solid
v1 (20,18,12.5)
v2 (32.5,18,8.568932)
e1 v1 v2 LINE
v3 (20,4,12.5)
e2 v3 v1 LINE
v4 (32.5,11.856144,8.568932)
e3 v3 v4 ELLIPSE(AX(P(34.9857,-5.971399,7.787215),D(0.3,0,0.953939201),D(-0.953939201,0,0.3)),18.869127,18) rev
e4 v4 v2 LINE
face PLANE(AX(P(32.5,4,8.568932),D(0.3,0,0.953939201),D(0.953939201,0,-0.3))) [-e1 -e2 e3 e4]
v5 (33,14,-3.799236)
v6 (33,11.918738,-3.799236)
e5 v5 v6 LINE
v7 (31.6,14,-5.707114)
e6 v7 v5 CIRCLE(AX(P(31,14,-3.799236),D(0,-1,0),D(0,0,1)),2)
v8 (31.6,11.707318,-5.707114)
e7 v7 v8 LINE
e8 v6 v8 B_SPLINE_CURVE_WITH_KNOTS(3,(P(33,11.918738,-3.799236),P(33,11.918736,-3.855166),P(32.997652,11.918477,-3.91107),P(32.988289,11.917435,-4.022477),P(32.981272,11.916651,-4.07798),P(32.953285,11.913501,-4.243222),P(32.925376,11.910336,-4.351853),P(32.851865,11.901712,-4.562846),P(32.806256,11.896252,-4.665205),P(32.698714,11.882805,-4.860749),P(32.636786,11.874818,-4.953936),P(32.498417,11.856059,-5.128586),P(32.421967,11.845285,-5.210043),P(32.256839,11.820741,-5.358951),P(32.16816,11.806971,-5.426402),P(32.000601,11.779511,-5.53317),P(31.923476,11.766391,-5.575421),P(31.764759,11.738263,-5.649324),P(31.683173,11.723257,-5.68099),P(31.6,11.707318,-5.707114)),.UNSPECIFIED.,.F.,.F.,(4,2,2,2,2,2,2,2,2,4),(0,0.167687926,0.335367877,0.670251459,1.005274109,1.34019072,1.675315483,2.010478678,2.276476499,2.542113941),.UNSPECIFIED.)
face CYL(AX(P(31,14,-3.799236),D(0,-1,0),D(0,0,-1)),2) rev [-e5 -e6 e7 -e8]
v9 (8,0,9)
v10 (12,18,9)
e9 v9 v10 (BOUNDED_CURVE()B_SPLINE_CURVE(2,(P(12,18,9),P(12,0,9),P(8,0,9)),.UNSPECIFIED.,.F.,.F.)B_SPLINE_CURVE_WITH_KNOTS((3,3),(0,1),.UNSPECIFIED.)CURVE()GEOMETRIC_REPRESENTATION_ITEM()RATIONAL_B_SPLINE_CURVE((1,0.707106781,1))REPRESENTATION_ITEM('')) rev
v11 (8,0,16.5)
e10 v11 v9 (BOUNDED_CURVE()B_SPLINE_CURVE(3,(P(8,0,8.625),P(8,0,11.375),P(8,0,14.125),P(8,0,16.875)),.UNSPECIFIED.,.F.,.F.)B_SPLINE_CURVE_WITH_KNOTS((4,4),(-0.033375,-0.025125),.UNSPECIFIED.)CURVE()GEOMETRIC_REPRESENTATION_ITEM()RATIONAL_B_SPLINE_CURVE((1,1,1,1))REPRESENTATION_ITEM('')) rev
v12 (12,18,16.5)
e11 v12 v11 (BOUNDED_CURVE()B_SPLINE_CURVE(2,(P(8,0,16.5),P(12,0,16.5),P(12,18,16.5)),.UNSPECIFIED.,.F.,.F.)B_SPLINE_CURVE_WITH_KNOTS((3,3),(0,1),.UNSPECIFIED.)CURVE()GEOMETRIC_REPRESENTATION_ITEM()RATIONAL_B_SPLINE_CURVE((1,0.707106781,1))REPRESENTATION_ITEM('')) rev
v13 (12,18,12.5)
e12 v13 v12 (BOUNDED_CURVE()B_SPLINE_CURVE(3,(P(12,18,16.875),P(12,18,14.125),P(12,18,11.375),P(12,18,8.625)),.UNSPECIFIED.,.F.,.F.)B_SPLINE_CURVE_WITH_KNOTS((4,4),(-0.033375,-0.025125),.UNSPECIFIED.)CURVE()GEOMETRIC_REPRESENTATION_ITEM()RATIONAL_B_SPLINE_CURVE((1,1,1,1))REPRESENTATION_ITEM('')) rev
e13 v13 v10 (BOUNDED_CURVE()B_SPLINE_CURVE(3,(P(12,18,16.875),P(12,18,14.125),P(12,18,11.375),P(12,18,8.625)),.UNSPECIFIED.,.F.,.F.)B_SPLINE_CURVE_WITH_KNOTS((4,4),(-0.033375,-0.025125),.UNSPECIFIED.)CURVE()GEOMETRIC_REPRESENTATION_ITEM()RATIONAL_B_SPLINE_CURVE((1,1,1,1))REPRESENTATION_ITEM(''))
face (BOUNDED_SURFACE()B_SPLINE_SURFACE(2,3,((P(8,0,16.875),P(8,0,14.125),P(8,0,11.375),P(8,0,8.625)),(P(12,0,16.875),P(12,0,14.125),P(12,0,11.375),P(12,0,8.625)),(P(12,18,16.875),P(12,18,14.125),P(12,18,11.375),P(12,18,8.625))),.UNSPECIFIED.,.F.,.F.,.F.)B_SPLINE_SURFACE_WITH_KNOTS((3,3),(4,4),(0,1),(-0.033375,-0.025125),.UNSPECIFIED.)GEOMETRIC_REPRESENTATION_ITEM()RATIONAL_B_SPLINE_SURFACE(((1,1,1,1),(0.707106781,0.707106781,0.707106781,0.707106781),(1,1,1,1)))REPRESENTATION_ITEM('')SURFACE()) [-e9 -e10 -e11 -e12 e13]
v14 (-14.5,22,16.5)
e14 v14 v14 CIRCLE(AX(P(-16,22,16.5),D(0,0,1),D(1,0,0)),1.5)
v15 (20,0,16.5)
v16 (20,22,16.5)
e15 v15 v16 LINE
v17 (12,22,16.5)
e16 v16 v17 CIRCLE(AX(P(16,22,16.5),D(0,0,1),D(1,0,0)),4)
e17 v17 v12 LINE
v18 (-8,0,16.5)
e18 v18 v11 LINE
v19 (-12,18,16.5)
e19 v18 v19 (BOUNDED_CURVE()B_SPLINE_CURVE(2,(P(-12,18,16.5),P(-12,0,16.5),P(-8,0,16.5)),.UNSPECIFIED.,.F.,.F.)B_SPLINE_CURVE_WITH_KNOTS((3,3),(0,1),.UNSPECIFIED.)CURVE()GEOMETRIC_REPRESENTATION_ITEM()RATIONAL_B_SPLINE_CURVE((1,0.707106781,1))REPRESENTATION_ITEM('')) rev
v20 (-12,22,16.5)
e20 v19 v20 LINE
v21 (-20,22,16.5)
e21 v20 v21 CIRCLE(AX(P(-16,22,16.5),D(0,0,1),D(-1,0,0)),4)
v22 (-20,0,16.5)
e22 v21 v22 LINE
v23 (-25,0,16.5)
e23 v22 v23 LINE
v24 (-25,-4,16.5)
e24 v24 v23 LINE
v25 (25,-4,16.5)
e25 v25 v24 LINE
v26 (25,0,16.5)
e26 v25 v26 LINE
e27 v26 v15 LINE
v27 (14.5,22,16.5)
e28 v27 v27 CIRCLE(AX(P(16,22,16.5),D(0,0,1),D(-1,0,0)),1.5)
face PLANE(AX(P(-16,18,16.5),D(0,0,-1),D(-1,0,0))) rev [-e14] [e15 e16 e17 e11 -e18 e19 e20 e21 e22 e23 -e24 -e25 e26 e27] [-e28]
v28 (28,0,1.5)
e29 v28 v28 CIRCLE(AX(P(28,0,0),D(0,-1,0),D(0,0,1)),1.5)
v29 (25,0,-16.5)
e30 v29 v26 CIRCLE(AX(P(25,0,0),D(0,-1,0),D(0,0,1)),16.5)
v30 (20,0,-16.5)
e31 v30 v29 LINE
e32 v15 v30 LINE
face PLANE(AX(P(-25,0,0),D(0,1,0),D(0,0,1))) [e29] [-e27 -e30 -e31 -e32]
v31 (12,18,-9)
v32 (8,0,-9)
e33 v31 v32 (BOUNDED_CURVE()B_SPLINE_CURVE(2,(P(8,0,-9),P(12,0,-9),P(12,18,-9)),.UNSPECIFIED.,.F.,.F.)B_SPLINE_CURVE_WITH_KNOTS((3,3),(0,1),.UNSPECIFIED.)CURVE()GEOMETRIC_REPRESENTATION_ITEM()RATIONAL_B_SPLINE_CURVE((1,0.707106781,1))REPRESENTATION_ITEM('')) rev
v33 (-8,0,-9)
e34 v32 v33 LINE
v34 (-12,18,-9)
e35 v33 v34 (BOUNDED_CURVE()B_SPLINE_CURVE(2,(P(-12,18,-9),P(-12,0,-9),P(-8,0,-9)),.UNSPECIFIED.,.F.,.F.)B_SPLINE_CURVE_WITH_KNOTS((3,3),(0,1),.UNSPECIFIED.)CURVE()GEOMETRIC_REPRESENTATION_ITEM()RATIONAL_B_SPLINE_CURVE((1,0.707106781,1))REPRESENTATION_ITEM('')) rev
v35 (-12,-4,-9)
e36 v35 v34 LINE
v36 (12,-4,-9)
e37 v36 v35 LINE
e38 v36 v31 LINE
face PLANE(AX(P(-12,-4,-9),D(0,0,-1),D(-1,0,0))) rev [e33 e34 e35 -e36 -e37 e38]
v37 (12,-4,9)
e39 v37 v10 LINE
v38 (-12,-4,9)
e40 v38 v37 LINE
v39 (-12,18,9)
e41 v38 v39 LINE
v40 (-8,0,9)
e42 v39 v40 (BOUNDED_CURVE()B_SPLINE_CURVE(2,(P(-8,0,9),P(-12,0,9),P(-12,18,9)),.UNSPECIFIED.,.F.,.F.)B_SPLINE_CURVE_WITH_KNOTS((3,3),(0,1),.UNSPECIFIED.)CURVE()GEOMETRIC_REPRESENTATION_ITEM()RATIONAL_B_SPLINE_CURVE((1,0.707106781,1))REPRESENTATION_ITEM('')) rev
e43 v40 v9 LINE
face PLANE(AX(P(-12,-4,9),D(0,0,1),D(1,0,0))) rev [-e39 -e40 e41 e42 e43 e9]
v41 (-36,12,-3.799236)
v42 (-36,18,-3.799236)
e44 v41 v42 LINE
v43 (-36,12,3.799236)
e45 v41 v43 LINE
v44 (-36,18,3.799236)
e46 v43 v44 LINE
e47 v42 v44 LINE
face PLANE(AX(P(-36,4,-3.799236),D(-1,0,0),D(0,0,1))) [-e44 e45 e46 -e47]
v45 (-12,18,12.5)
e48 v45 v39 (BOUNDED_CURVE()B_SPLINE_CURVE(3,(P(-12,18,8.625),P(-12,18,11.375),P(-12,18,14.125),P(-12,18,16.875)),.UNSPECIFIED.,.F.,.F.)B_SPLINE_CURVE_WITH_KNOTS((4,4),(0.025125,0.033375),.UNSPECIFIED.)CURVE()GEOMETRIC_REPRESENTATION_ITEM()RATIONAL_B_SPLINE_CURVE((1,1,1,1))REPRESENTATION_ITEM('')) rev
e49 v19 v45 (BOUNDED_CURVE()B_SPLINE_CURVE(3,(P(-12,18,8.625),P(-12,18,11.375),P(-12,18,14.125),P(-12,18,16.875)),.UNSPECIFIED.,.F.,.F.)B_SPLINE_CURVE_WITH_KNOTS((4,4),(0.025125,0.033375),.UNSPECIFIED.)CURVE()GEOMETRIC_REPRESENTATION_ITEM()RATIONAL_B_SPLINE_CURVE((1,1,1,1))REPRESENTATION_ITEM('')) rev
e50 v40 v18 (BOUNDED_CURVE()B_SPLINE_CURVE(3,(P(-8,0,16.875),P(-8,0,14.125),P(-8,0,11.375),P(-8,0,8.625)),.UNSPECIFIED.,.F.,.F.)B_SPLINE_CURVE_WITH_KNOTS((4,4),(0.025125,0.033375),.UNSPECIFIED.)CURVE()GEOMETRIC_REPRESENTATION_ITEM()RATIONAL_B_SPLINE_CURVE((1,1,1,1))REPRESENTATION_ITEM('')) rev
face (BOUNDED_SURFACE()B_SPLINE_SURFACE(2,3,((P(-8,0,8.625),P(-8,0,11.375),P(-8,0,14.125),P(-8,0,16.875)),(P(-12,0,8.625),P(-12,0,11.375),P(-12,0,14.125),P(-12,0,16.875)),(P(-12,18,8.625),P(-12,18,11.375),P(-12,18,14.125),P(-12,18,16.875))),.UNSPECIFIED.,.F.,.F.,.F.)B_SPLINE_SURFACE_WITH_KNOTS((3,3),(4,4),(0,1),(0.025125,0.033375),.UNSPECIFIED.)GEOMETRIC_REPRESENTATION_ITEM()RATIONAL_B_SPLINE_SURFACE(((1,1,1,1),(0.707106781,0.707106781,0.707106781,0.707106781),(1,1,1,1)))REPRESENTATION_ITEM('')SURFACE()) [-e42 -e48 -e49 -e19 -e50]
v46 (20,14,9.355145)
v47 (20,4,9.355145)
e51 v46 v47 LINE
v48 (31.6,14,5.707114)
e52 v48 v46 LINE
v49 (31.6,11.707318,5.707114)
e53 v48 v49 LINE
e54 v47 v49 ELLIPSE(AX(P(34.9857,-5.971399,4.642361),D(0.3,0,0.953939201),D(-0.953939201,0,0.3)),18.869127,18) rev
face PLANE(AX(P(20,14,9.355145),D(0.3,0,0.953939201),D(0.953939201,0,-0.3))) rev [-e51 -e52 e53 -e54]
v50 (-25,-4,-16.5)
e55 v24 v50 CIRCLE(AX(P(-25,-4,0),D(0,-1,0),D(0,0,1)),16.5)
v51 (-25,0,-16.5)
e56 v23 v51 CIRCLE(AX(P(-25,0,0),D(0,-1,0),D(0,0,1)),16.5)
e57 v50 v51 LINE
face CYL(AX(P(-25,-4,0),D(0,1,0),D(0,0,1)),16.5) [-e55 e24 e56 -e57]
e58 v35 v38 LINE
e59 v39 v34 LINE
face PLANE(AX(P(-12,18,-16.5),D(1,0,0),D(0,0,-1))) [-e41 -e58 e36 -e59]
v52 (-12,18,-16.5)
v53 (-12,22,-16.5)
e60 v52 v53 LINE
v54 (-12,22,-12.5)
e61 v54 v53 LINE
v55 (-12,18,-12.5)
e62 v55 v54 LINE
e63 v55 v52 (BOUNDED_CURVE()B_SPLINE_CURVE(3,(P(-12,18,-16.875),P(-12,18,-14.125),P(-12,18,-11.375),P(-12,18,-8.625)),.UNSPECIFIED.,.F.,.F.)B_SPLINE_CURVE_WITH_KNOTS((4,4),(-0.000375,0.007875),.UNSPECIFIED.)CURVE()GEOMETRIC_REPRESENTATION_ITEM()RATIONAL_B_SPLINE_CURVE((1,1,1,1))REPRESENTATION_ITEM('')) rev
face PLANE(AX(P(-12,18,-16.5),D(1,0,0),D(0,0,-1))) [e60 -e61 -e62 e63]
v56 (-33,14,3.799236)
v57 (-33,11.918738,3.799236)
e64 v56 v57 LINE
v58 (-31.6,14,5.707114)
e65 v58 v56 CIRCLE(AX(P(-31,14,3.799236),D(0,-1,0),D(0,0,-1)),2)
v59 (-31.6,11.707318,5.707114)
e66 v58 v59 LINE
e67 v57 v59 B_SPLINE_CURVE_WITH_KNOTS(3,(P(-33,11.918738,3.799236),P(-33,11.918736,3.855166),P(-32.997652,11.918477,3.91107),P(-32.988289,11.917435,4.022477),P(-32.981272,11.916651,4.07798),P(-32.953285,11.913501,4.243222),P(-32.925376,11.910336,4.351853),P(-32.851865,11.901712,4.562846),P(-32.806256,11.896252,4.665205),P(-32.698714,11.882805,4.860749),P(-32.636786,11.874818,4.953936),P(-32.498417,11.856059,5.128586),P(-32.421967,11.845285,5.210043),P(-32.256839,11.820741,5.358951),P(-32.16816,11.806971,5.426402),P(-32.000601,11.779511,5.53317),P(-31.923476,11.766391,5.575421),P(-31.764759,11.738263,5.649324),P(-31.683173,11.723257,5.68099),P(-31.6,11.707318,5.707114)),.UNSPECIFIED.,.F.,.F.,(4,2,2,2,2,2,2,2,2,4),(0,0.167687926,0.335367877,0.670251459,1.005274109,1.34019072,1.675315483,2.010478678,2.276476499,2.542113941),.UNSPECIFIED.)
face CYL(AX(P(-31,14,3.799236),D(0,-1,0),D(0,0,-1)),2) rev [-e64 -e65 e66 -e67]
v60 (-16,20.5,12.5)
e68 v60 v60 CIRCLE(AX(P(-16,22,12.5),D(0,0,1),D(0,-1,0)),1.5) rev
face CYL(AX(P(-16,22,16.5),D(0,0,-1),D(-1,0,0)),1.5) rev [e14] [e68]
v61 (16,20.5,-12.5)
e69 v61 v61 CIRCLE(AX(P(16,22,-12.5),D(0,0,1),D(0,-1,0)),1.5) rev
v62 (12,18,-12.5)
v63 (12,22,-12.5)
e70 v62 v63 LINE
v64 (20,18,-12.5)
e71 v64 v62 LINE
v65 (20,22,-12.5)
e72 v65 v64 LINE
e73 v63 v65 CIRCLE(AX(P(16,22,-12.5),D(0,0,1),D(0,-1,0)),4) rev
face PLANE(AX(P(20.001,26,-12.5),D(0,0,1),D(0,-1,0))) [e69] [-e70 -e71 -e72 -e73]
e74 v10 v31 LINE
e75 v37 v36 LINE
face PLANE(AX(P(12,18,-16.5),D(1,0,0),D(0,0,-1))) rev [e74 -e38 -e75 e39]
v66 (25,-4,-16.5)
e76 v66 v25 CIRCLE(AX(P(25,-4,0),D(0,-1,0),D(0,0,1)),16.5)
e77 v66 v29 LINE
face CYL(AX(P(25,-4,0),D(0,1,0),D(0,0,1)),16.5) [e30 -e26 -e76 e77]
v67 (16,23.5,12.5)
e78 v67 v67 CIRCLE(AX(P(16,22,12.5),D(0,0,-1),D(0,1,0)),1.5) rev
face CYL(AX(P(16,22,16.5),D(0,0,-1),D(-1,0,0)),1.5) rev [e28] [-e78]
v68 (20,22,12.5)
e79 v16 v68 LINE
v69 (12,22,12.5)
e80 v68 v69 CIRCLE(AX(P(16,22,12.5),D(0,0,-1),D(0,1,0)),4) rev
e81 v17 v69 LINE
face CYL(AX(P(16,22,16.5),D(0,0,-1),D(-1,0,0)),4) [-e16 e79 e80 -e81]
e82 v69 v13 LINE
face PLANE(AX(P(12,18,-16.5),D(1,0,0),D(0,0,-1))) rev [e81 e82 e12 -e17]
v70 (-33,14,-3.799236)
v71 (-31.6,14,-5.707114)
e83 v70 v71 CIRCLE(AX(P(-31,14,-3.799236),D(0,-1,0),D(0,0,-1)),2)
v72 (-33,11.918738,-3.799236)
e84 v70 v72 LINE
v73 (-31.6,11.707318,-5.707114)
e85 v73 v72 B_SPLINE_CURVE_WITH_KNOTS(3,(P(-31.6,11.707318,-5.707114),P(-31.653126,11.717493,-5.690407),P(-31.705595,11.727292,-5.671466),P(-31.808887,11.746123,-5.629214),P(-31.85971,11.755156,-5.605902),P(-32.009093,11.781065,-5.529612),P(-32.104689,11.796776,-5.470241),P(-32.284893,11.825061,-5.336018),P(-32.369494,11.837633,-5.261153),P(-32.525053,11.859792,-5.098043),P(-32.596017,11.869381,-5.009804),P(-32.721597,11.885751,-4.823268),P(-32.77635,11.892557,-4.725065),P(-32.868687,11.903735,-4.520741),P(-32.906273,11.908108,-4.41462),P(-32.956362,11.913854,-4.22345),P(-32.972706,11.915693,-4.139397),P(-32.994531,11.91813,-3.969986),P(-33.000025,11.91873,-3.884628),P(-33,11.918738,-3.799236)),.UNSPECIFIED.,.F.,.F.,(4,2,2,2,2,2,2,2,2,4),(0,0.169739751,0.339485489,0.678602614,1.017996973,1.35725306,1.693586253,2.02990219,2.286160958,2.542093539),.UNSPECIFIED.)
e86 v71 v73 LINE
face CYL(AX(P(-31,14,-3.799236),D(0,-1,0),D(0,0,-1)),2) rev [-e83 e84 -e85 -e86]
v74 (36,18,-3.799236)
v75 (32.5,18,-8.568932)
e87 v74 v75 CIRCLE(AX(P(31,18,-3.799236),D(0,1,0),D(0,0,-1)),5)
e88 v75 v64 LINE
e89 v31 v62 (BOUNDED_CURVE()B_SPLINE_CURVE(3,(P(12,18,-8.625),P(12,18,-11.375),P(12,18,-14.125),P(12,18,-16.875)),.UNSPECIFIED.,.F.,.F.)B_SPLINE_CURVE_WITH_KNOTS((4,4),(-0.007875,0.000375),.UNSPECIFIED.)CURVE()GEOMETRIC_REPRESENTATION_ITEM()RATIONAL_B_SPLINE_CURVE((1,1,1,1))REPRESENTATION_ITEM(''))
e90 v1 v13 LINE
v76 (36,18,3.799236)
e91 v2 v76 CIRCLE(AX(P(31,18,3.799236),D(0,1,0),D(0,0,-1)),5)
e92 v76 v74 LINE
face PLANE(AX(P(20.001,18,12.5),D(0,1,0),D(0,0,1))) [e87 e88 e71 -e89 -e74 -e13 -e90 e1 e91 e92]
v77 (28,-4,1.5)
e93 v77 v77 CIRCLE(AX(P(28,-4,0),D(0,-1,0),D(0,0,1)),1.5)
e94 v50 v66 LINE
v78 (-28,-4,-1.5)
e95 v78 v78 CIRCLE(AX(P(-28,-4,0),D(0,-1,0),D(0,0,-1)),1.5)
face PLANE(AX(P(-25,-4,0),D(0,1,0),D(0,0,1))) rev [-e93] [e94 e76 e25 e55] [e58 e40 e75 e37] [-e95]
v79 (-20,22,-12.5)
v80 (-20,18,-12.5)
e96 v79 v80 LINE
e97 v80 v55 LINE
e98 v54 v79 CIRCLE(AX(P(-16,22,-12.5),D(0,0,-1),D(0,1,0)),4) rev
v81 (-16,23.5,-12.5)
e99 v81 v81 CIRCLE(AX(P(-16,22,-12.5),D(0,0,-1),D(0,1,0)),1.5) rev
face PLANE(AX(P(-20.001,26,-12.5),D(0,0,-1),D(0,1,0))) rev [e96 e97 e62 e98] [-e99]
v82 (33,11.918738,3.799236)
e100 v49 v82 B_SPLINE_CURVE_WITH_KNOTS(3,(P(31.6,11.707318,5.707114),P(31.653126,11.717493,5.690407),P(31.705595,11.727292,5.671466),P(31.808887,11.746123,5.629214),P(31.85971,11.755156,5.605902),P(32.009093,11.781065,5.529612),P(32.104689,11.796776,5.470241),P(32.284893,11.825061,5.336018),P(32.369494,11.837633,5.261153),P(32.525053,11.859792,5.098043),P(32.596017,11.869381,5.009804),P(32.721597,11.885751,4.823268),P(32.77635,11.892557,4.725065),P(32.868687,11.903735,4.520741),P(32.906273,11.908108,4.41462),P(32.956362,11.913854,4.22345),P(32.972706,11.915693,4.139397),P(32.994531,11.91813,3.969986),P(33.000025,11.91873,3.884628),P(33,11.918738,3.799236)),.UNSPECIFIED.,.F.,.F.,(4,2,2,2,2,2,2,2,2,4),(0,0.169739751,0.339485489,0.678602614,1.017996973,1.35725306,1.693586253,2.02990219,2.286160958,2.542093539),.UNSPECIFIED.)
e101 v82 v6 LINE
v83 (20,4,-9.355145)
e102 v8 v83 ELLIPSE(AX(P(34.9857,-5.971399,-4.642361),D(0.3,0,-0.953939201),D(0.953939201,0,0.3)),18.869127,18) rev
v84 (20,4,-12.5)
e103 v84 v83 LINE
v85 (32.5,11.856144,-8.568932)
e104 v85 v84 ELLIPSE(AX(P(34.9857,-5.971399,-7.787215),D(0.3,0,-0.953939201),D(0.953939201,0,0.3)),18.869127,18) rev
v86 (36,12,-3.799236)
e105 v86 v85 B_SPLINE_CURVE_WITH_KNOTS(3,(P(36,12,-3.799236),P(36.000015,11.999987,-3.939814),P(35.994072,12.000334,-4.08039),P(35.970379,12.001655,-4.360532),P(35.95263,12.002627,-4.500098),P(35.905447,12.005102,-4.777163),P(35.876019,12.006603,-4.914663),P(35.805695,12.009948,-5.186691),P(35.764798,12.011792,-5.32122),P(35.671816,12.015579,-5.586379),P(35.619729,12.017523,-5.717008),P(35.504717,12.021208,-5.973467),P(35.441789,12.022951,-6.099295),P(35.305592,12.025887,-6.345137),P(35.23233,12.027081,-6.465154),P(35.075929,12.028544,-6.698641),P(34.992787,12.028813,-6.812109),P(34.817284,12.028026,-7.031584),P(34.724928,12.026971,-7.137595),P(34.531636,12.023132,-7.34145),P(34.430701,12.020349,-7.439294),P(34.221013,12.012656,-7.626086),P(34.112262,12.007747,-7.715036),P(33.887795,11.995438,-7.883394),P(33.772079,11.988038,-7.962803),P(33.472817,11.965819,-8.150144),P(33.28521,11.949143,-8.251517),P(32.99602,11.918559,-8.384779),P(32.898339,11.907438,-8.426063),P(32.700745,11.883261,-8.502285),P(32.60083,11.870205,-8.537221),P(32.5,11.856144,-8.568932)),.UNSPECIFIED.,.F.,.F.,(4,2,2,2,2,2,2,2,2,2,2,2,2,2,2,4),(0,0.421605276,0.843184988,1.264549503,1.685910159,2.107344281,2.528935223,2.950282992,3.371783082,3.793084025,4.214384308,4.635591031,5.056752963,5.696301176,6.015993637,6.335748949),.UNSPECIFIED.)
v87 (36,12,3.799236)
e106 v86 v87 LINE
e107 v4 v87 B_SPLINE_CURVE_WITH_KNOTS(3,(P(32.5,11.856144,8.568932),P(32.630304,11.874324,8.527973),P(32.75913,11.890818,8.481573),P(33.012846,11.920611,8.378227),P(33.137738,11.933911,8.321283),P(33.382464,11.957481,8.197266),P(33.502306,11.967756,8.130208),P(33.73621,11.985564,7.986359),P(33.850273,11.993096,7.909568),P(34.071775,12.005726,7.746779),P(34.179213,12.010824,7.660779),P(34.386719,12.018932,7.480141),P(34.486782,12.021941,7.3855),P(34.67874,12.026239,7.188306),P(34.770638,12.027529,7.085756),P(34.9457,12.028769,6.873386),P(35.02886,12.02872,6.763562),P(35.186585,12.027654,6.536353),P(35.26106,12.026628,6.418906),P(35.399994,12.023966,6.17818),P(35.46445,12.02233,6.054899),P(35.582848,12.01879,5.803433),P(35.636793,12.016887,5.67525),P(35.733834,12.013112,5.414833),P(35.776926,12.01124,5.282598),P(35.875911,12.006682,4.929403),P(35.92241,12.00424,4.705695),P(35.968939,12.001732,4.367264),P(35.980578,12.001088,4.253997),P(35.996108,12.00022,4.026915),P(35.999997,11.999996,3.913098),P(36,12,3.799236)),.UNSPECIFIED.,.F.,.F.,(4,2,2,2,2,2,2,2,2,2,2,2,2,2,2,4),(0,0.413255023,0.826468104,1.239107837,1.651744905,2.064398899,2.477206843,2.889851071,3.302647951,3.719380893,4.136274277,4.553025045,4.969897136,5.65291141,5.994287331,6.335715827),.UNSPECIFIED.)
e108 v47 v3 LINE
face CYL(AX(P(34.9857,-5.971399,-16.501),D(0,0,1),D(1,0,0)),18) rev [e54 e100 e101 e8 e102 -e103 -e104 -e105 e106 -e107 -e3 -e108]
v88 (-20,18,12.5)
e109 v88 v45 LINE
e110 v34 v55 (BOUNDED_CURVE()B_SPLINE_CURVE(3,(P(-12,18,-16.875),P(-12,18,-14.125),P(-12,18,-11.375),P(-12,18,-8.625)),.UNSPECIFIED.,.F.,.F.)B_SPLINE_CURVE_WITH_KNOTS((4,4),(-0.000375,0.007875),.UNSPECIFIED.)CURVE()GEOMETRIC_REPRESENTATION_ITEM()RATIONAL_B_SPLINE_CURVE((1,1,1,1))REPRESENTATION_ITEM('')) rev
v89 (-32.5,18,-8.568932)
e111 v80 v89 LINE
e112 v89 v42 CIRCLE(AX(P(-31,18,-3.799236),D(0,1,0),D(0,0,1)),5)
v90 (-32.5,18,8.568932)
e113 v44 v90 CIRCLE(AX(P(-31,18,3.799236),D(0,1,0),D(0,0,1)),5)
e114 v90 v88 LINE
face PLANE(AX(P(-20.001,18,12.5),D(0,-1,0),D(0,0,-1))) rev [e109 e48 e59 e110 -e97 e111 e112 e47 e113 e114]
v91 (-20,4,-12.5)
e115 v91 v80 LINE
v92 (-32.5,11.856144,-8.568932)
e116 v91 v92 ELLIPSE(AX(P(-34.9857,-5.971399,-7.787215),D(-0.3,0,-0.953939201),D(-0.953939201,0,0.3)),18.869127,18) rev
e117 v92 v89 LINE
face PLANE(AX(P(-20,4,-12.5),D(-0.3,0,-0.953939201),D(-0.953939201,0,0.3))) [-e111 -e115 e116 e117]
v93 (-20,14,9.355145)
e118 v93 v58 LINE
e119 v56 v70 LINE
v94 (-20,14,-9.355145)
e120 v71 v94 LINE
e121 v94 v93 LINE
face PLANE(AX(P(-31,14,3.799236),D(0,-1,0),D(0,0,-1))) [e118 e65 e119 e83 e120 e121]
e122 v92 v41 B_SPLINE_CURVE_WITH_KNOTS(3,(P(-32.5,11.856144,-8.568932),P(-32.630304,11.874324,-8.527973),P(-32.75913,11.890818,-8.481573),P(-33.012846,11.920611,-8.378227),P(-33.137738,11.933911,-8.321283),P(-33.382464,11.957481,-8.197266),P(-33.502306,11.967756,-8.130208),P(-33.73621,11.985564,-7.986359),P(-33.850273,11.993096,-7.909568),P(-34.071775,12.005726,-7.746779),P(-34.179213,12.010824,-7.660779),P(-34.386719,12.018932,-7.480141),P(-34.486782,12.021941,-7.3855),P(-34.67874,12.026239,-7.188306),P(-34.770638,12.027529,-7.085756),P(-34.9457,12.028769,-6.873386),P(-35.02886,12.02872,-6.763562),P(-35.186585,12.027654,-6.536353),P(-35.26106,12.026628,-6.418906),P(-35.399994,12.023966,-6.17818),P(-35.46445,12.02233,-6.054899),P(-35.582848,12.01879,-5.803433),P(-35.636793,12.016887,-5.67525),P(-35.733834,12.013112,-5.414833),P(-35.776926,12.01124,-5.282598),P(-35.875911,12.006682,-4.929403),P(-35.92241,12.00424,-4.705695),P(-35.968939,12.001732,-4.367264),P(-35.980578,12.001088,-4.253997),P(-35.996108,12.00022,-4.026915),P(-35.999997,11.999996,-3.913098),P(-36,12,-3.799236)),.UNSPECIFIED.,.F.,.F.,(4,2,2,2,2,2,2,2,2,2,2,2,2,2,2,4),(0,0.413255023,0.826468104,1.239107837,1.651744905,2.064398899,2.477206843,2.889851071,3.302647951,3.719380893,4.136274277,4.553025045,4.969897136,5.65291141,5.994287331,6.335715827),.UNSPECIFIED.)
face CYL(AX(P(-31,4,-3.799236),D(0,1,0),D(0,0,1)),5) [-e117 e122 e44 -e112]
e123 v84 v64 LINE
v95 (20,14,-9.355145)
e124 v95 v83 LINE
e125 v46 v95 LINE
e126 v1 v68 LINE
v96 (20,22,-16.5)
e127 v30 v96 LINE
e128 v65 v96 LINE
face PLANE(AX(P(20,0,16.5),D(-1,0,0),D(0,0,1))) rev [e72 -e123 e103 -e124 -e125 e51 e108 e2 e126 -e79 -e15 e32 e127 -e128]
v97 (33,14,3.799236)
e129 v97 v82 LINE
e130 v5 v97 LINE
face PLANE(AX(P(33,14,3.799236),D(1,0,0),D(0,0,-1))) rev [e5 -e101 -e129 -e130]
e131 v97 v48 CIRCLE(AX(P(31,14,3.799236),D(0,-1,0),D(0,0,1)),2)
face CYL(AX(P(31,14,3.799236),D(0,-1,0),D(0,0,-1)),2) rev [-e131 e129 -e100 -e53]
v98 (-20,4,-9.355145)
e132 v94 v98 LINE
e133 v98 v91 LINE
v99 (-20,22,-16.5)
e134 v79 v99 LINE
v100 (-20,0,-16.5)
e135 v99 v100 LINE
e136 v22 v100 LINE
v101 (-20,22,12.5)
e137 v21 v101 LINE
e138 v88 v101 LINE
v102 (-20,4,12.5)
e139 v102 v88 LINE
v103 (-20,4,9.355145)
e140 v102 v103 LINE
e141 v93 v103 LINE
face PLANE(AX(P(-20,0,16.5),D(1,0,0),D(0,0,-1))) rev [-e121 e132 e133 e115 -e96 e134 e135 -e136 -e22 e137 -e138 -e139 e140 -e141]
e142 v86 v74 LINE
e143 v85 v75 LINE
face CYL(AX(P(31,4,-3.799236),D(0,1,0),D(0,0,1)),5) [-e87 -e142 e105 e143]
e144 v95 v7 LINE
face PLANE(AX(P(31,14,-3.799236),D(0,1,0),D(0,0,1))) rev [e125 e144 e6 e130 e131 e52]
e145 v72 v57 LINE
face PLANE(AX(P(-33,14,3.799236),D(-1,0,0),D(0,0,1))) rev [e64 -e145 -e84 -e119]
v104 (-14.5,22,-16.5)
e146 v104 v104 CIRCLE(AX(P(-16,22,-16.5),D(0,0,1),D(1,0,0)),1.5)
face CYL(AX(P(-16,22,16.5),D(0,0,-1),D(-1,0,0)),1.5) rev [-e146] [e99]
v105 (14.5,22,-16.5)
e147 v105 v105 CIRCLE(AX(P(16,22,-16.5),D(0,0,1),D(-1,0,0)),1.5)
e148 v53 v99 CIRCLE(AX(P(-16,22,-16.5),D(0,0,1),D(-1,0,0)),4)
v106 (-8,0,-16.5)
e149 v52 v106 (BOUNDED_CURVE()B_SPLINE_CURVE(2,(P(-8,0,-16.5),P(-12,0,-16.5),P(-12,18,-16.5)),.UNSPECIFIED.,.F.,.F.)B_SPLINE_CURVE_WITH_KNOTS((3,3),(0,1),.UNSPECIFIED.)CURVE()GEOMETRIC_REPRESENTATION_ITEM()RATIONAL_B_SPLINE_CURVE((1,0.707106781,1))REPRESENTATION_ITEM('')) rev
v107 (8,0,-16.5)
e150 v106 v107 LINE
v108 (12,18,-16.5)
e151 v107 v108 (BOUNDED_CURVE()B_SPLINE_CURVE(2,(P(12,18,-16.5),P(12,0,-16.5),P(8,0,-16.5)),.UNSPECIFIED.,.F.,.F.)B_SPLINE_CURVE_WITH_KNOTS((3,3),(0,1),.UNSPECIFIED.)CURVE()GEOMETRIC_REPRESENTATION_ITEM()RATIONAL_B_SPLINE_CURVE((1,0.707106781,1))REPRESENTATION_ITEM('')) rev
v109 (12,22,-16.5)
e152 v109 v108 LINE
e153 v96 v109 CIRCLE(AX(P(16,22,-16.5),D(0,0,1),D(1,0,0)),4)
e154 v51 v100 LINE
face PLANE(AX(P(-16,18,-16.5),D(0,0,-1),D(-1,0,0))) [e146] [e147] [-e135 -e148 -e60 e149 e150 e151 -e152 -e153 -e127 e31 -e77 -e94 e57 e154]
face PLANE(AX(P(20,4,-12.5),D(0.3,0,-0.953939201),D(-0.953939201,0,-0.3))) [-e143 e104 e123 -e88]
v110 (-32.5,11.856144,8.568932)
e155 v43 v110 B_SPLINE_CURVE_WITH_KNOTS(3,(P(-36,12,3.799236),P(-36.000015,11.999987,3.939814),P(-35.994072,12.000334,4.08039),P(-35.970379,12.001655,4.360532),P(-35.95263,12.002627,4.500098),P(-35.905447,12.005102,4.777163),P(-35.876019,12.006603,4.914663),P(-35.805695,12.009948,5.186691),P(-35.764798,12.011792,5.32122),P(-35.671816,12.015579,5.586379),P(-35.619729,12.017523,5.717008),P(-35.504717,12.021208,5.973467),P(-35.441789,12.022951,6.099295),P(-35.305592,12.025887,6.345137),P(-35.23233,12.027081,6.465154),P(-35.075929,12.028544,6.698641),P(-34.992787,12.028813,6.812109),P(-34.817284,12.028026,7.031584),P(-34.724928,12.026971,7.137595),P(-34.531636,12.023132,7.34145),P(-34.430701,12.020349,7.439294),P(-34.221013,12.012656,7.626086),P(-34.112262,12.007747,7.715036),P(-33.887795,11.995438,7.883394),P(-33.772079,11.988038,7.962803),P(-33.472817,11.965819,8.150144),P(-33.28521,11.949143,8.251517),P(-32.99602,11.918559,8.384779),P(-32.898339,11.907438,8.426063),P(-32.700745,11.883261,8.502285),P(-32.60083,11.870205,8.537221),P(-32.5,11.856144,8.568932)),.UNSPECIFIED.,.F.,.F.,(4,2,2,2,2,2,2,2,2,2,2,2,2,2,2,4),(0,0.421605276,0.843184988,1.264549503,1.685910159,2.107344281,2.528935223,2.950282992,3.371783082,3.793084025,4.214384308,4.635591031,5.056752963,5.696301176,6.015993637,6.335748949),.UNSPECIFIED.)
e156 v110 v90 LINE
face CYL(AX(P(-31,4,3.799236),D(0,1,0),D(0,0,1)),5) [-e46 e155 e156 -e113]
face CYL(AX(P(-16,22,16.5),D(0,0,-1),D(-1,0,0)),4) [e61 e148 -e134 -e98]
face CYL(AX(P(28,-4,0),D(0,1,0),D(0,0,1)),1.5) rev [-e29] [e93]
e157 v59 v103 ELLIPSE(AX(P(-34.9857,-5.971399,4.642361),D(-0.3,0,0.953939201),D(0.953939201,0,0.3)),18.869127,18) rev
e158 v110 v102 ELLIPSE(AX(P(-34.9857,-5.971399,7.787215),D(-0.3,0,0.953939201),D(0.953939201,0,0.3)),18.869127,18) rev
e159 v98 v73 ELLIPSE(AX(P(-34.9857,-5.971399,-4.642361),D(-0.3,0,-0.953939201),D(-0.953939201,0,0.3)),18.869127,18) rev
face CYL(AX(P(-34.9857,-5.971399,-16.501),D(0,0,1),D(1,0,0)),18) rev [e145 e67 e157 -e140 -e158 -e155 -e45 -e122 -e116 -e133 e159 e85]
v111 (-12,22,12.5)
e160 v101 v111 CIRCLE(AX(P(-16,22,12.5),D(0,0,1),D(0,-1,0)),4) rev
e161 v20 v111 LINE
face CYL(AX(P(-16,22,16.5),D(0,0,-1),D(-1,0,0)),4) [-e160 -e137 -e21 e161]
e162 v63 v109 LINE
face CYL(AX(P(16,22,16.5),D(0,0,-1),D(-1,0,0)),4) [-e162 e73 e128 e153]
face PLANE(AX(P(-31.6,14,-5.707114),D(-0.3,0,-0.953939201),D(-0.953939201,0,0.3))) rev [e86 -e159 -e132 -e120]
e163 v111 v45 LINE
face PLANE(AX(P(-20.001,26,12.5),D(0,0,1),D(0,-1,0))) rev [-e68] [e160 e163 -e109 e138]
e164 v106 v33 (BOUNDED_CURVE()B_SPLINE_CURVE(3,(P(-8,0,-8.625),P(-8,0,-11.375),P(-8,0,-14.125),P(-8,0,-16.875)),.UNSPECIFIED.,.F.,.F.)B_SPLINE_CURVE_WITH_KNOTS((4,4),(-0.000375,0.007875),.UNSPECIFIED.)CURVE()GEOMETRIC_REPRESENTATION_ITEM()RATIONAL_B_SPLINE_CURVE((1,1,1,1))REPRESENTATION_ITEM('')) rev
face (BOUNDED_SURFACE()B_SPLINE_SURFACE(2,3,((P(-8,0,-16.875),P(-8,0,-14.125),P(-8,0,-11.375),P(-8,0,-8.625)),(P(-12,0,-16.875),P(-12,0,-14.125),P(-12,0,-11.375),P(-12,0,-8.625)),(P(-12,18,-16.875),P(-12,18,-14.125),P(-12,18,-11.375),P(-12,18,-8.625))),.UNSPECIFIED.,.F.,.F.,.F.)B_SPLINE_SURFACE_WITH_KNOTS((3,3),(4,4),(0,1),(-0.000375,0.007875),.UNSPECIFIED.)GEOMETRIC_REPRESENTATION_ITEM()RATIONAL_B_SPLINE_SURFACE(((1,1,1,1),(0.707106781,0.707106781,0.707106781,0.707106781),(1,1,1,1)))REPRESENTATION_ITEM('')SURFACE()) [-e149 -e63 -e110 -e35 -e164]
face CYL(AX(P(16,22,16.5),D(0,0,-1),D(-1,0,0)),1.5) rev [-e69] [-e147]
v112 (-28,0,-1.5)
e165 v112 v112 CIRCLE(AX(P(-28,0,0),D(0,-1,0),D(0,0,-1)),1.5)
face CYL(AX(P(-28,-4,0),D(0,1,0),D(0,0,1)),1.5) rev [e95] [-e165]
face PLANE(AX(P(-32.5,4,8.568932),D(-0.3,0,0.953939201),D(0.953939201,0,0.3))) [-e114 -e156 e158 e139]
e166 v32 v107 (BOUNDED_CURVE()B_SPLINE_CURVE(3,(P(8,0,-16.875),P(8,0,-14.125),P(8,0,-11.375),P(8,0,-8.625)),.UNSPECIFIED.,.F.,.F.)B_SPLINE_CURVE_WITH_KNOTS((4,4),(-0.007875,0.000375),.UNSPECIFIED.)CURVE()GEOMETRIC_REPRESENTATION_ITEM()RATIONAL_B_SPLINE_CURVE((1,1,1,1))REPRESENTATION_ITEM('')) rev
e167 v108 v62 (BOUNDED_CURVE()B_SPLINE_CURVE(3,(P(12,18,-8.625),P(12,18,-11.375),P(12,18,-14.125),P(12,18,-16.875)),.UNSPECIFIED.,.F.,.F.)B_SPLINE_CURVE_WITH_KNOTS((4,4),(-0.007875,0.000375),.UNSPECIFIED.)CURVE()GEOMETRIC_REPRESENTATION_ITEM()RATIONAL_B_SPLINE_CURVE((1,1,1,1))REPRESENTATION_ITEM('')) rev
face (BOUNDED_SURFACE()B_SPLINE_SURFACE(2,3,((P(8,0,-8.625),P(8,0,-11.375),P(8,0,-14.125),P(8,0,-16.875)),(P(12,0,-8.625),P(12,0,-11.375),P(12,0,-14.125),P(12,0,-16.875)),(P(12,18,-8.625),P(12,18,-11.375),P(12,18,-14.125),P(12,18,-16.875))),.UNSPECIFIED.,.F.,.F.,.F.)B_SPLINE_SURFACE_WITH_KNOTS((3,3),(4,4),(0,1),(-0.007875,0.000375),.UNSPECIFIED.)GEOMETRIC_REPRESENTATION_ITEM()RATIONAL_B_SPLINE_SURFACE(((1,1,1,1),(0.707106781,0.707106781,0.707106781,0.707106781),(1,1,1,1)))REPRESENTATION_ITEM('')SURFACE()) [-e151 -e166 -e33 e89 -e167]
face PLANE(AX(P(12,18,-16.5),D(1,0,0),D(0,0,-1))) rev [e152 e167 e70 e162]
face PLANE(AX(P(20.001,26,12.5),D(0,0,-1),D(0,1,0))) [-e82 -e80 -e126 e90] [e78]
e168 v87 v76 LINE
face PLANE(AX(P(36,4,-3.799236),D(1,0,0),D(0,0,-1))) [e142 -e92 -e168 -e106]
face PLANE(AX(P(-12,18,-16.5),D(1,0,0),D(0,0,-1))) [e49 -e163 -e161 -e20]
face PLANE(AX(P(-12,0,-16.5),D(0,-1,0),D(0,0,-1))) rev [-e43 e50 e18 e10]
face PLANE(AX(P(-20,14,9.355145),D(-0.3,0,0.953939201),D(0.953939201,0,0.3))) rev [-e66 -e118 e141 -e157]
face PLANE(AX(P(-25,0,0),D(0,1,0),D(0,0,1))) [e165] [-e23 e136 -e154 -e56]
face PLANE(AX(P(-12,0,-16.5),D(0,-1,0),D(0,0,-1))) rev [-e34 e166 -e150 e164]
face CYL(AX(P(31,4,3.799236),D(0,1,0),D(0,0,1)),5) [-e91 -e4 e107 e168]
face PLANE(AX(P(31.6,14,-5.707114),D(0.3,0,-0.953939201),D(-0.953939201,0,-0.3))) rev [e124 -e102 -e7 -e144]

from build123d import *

# Parameters (mm, degrees)
SKETCH1_W                      = 32
SKETCH1_H                      = 33
BOSS_EXTRUDE1_DEPTH            = 18
SHELL1_T                       = -4
SKETCH2_R                      = 1.5
BOSS_EXTRUDE2_DEPTH            = 16.5
CUT_EXTRUDE5_REACH             = 46.41
SKETCH10_W                     = 25
SKETCH10_H                     = 8
CUT_EXTRUDE5_DIRECTION_2_REACH = 46.41
BOSS_EXTRUDE3_DEPTH            = 14
CUT_EXTRUDE6_DEPTH             = 10
CUT_EXTRUDE7_REACH             = 57.326
SKETCH15_R                     = 1.5
BOSS_EXTRUDE5_DEPTH            = 4
SKETCH9_W                      = 24
SKETCH9_H                      = 18
CUT_EXTRUDE4_DEPTH             = 50.784535752
SKETCH16_W                     = 24
SKETCH16_H                     = 18
CUT_EXTRUDE8_DEPTH             = 60.052942348
FILLET1_SIZE                   = 4
FILLET1_SIZE_2                 = 18
FILLET2_SIZE                   = 4
FILLET2_SIZE_2                 = 18


with BuildPart() as part:
    # Sketch1 → Boss-Extrude1 (new body)
    with BuildSketch(Plane(origin=(0, 0, 0), x_dir=(1, 0, 0), z_dir=(0, 1, 0))):
        Rectangle(SKETCH1_W, SKETCH1_H)
    extrude(amount=BOSS_EXTRUDE1_DEPTH)

    # Shell1
    shell1_openings = [part.faces().sort_by_distance(p)[0] for p in [
        (0, 18, 0),
    ]]
    offset(amount=SHELL1_T, openings=shell1_openings, kind=Kind.INTERSECTION)

    # Sketch2 → Boss-Extrude2 (add, symmetric)
    # profile 1 of 2: a face of its own
    with BuildSketch(Plane.XY):
        with BuildLine():
            Line((-16, 0), (-20, 0))
            Line((-20, 0), (-20, 22))
            ThreePointArc((-20, 22), (-16, 26), (-12, 22))
            Line((-12, 22), (-12, 18))
            Line((-12, 18), (-16, 18))
            Line((-16, 18), (-16, 0))
        make_face()
        with Locations((-16, 22)):
            Circle(SKETCH2_R, mode=Mode.SUBTRACT)
    # profile 2 of 2: a face of its own
    with BuildSketch(Plane.XY):
        with BuildLine():
            Line((16, 18), (16, 0))
            Line((16, 0), (20, 0))
            Line((20, 0), (20, 22))
            ThreePointArc((20, 22), (16, 26), (12, 22))
            Line((12, 22), (12, 18))
            Line((12, 18), (16, 18))
        make_face()
        with Locations(Location((16, 22, 0), (0, 0, 180))):
            Circle(SKETCH2_R, mode=Mode.SUBTRACT)
    extrude(amount=BOSS_EXTRUDE2_DEPTH, both=True)

    # Sketch10 → Cut-Extrude5 (cut, up to next)
    with BuildSketch(Plane(origin=(-12, 0, 0), x_dir=(0, 0, -1), z_dir=(1, 0, 0)), mode=Mode.PRIVATE) as cut_extrude5_sk1:
        with Locations((0, 22)):
            Rectangle(SKETCH10_W, SKETCH10_H)
    cut_extrude5_tool1 = extrude(cut_extrude5_sk1.sketch, amount=-CUT_EXTRUDE5_REACH, mode=Mode.PRIVATE) & part.part
    add(cut_extrude5_tool1.solids().sort_by_distance((-12, 22, 0))[0], mode=Mode.SUBTRACT)

    # Sketch10 → Cut-Extrude5 direction 2 (cut, up to next)
    with BuildSketch(Plane(origin=(-12, 0, 0), x_dir=(0, 0, -1), z_dir=(1, 0, 0)), mode=Mode.PRIVATE) as cut_extrude5_direction_2_sk1:
        with Locations((0, 22)):
            Rectangle(SKETCH10_W, SKETCH10_H)
    cut_extrude5_direction_2_tool1 = extrude(cut_extrude5_direction_2_sk1.sketch, amount=CUT_EXTRUDE5_DIRECTION_2_REACH, mode=Mode.PRIVATE) & part.part
    add(cut_extrude5_direction_2_tool1.solids().sort_by_distance((-12, 22, 0))[0], mode=Mode.SUBTRACT)

    # Sketch11 → Boss-Extrude3 (add)
    with BuildSketch(Plane(origin=(0, 18, 0), x_dir=(1, 0, 0), z_dir=(0, 1, 0))):
        with BuildLine():
            Line((-20, 12.5), (-32.5, 8.568931862))
            ThreePointArc((-32.5, 8.568931862), (-35.031128874, 6.757275747), (-36, 3.799235855))
            Line((-36, 3.799235855), (-36, -3.799235855))
            ThreePointArc((-36, -3.799235855), (-35.031128874, -6.757275747), (-32.5, -8.568931862))
            Line((-32.5, -8.568931862), (-20, -12.5))
            Line((-20, -12.5), (-20, 12.5))
        make_face()
        with BuildLine():
            Line((32.5, -8.568931862), (20, -12.5))
            Line((20, -12.5), (20, 12.5))
            Line((20, 12.5), (32.5, 8.568931862))
            ThreePointArc((32.5, 8.568931862), (35.031128874, 6.757275747), (36, 3.799235855))
            Line((36, 3.799235855), (36, -3.799235855))
            ThreePointArc((36, -3.799235855), (35.031128874, -6.757275747), (32.5, -8.568931862))
        make_face()
    extrude(amount=-BOSS_EXTRUDE3_DEPTH)

    # Sketch12 → Cut-Extrude6 (cut)
    with BuildSketch(Plane.XZ.offset(-4)):
        with BuildLine():
            Line((-20, -9.35514549), (-20, 9.35514549))
            Line((-20, 9.35514549), (-31.6, 5.707114258))
            ThreePointArc((-31.6, 5.707114258), (-32.61245155, 4.982451812), (-33, 3.799235855))
            Line((-33, 3.799235855), (-33, -3.799235855))
            ThreePointArc((-33, -3.799235855), (-32.61245155, -4.982451812), (-31.6, -5.707114258))
            Line((-31.6, -5.707114258), (-20, -9.35514549))
        make_face()
        with BuildLine():
            Line((31.6, -5.707114258), (20, -9.35514549))
            Line((20, -9.35514549), (20, 9.35514549))
            Line((20, 9.35514549), (31.6, 5.707114258))
            ThreePointArc((31.6, 5.707114258), (32.61245155, 4.982451812), (33, 3.799235855))
            Line((33, 3.799235855), (33, -3.799235855))
            ThreePointArc((33, -3.799235855), (32.61245155, -4.982451812), (31.6, -5.707114258))
        make_face()
    extrude(amount=-CUT_EXTRUDE6_DEPTH, mode=Mode.SUBTRACT)

    # Sketch13 → Cut-Extrude7 (cut, up to next)
    with BuildSketch(Plane.XY.offset(16.5), mode=Mode.PRIVATE) as cut_extrude7_sk1:
        with BuildLine():
            Line((-36, 12), (-36, 4))
            Line((-36, 4), (-20, 4))
            ThreePointArc((-20, 4), (-26.93585496, 10.128290081), (-36, 12))
        make_face()
    cut_extrude7_tool1 = extrude(cut_extrude7_sk1.sketch, amount=-CUT_EXTRUDE7_REACH, mode=Mode.PRIVATE) & part.part
    # Sketch13 → Cut-Extrude7 (cut, up to next)
    with BuildSketch(Plane.XY.offset(16.5), mode=Mode.PRIVATE) as cut_extrude7_sk2:
        with BuildLine():
            Line((36, 4), (20, 4))
            ThreePointArc((20, 4), (26.93585496, 10.128290081), (36, 12))
            Line((36, 12), (36, 4))
        make_face()
    cut_extrude7_tool2 = extrude(cut_extrude7_sk2.sketch, amount=-CUT_EXTRUDE7_REACH, mode=Mode.PRIVATE) & part.part
    add(cut_extrude7_tool1.solids().sort_by_distance((-29.706779, 7.345809, 16.5))[0], mode=Mode.SUBTRACT)
    add(cut_extrude7_tool2.solids().sort_by_distance((29.706779, 7.345809, 16.5))[0], mode=Mode.SUBTRACT)

    # Sketch15 → Boss-Extrude5 (add)
    with BuildSketch(Plane.XZ):
        with BuildLine():
            Line((-25, 16.5), (25, 16.5))
            ThreePointArc((25, 16.5), (41.5, 0), (25, -16.5))
            Line((25, -16.5), (-25, -16.5))
            ThreePointArc((-25, -16.5), (-41.5, 0), (-25, 16.5))
        make_face()
        with Locations(Location((-28, 0, 0), (0, 0, 270))):
            Circle(SKETCH15_R, mode=Mode.SUBTRACT)
        with Locations(Location((28, 0, 0), (0, 0, 90))):
            Circle(SKETCH15_R, mode=Mode.SUBTRACT)
    extrude(amount=BOSS_EXTRUDE5_DEPTH)

    # Sketch9 → Cut-Extrude4 (cut, through all)
    with BuildSketch(Plane(origin=(0, 4, 0), x_dir=(1, 0, 0), z_dir=(0, 1, 0))):
        Rectangle(SKETCH9_W, SKETCH9_H)
    extrude(amount=-CUT_EXTRUDE4_DEPTH, mode=Mode.SUBTRACT)

    # Sketch16 → Cut-Extrude8 (cut, through all)
    with BuildSketch(Plane.XY.offset(16.5)):
        with Locations((0, 9)):
            Rectangle(SKETCH16_W, SKETCH16_H)
    extrude(amount=-CUT_EXTRUDE8_DEPTH, mode=Mode.SUBTRACT)

    # Fillet1
    # an asymmetric fillet: 18, 4 mm, written as the material it adds along each edge
    with BuildSketch(Plane(origin=(-12, 0, 36), x_dir=(1, 0, 0), z_dir=(0, 0, -1))) as fillet1_piece_1_section:
        with BuildLine():
            Bezier((FILLET1_SIZE, 0), (0, 0), (0, -FILLET1_SIZE_2), weights=[1, 0.707106781, 1])
            Line((0, -FILLET1_SIZE_2), (0, 0))
            Line((0, 0), (FILLET1_SIZE, 0))
        make_face()
    fillet1_piece_1 = extrude(amount=52.5, mode=Mode.PRIVATE)
    fillet1_piece_1 = split(fillet1_piece_1, bisect_by=Plane(origin=(-11.340639328, 5.113051829, 12.5), z_dir=(0, 0, 1)), keep=Keep.TOP, mode=Mode.PRIVATE)
    fillet1_piece_1 = split(fillet1_piece_1, bisect_by=Plane(origin=(-11.340639328, 5.113051829, 16.5), z_dir=(0, 0, -1)), keep=Keep.TOP, mode=Mode.PRIVATE)
    add(fillet1_piece_1)
    with BuildSketch(Plane(origin=(-12, 0, 36), x_dir=(1, 0, 0), z_dir=(0, 0, -1))) as fillet1_piece_2_section:
        with BuildLine():
            Bezier((FILLET1_SIZE, 0), (0, 0), (0, -FILLET1_SIZE_2), weights=[1, 0.707106781, 1])
            Line((0, -FILLET1_SIZE_2), (0, 0))
            Line((0, 0), (FILLET1_SIZE, 0))
        make_face()
    fillet1_piece_2 = extrude(amount=52.5, mode=Mode.PRIVATE)
    fillet1_piece_2 = split(fillet1_piece_2, bisect_by=Plane(origin=(-11.340638818, 5.113050372, 12.5), z_dir=(0, 0, -1)), keep=Keep.TOP, mode=Mode.PRIVATE)
    fillet1_piece_2 = split(fillet1_piece_2, bisect_by=Plane(origin=(-11.340638818, 5.113050372, 9), z_dir=(0, 0, 1)), keep=Keep.TOP, mode=Mode.PRIVATE)
    add(fillet1_piece_2)
    with BuildSketch(Plane(origin=(-12, 0, -9), x_dir=(1, 0, 0), z_dir=(0, 0, -1))) as fillet1_piece_3_section:
        with BuildLine():
            Bezier((FILLET1_SIZE, 0), (0, 0), (0, -FILLET1_SIZE_2), weights=[1, 0.707106781, 1])
            Line((0, -FILLET1_SIZE_2), (0, 0))
            Line((0, 0), (FILLET1_SIZE, 0))
        make_face()
    fillet1_piece_3 = extrude(amount=7.5, mode=Mode.PRIVATE)
    fillet1_piece_3 = split(fillet1_piece_3, bisect_by=Plane(origin=(-11.340634928, 5.11305877, -12.5), z_dir=(0, 0, 1)), keep=Keep.TOP, mode=Mode.PRIVATE)
    add(fillet1_piece_3)
    with BuildSketch(Plane(origin=(-12, 0, -9), x_dir=(1, 0, 0), z_dir=(0, 0, -1))) as fillet1_piece_4_section:
        with BuildLine():
            Bezier((FILLET1_SIZE, 0), (0, 0), (0, -FILLET1_SIZE_2), weights=[1, 0.707106781, 1])
            Line((0, -FILLET1_SIZE_2), (0, 0))
            Line((0, 0), (FILLET1_SIZE, 0))
        make_face()
    fillet1_piece_4 = extrude(amount=7.5, mode=Mode.PRIVATE)
    fillet1_piece_4 = split(fillet1_piece_4, bisect_by=Plane(origin=(-11.340634418, 5.113057313, -12.5), z_dir=(0, 0, -1)), keep=Keep.TOP, mode=Mode.PRIVATE)
    add(fillet1_piece_4)
    with BuildSketch(Plane(origin=(-12, 0, 16.5), x_dir=(1, 0, 0), z_dir=(0, 0, -1))) as fillet1_piece_5_section:
        with BuildLine():
            Bezier((FILLET1_SIZE, 0), (0, 0), (0, -FILLET1_SIZE_2), weights=[1, 0.707106781, 1])
            Line((0, -FILLET1_SIZE_2), (0, 0))
            Line((0, 0), (FILLET1_SIZE, 0))
        make_face()
    fillet1_piece_5 = extrude(amount=7.5, mode=Mode.PRIVATE)
    fillet1_piece_5 = split(fillet1_piece_5, bisect_by=Plane(origin=(-11.340639328, 5.113051829, 12.5), z_dir=(0, 0, 1)), keep=Keep.TOP, mode=Mode.PRIVATE)
    add(fillet1_piece_5)
    with BuildSketch(Plane(origin=(-12, 0, 16.5), x_dir=(1, 0, 0), z_dir=(0, 0, -1))) as fillet1_piece_6_section:
        with BuildLine():
            Bezier((FILLET1_SIZE, 0), (0, 0), (0, -FILLET1_SIZE_2), weights=[1, 0.707106781, 1])
            Line((0, -FILLET1_SIZE_2), (0, 0))
            Line((0, 0), (FILLET1_SIZE, 0))
        make_face()
    fillet1_piece_6 = extrude(amount=7.5, mode=Mode.PRIVATE)
    fillet1_piece_6 = split(fillet1_piece_6, bisect_by=Plane(origin=(-11.340638818, 5.113050372, 12.5), z_dir=(0, 0, -1)), keep=Keep.TOP, mode=Mode.PRIVATE)
    add(fillet1_piece_6)
    with BuildSketch(Plane(origin=(-12, 0, 16.5), x_dir=(1, 0, 0), z_dir=(0, 0, -1))) as fillet1_piece_7_section:
        with BuildLine():
            Bezier((FILLET1_SIZE, 0), (0, 0), (0, -FILLET1_SIZE_2), weights=[1, 0.707106781, 1])
            Line((0, -FILLET1_SIZE_2), (0, 0))
            Line((0, 0), (FILLET1_SIZE, 0))
        make_face()
    fillet1_piece_7 = extrude(amount=52.5, mode=Mode.PRIVATE)
    fillet1_piece_7 = split(fillet1_piece_7, bisect_by=Plane(origin=(-11.340634928, 5.11305877, -12.5), z_dir=(0, 0, 1)), keep=Keep.TOP, mode=Mode.PRIVATE)
    fillet1_piece_7 = split(fillet1_piece_7, bisect_by=Plane(origin=(-11.340634928, 5.11305877, -9), z_dir=(0, 0, -1)), keep=Keep.TOP, mode=Mode.PRIVATE)
    add(fillet1_piece_7)
    with BuildSketch(Plane(origin=(-12, 0, 16.5), x_dir=(1, 0, 0), z_dir=(0, 0, -1))) as fillet1_piece_8_section:
        with BuildLine():
            Bezier((FILLET1_SIZE, 0), (0, 0), (0, -FILLET1_SIZE_2), weights=[1, 0.707106781, 1])
            Line((0, -FILLET1_SIZE_2), (0, 0))
            Line((0, 0), (FILLET1_SIZE, 0))
        make_face()
    fillet1_piece_8 = extrude(amount=52.5, mode=Mode.PRIVATE)
    fillet1_piece_8 = split(fillet1_piece_8, bisect_by=Plane(origin=(-11.340634418, 5.113057313, -16.5), z_dir=(0, 0, 1)), keep=Keep.TOP, mode=Mode.PRIVATE)
    fillet1_piece_8 = split(fillet1_piece_8, bisect_by=Plane(origin=(-11.340634418, 5.113057313, -12.5), z_dir=(0, 0, -1)), keep=Keep.TOP, mode=Mode.PRIVATE)
    add(fillet1_piece_8)

    # Fillet2
    # an asymmetric fillet: 18, 4 mm, written as the material it adds along each edge
    with BuildSketch(Plane(origin=(12, 0, 36), x_dir=(-1, 0, 0), z_dir=(0, 0, -1))) as fillet2_piece_1_section:
        with BuildLine():
            Bezier((FILLET2_SIZE, 0), (0, 0), (0, FILLET2_SIZE_2), weights=[1, 0.707106781, 1])
            Line((0, FILLET2_SIZE_2), (0, 0))
            Line((0, 0), (FILLET2_SIZE, 0))
        make_face()
    fillet2_piece_1 = extrude(amount=52.5, mode=Mode.PRIVATE)
    fillet2_piece_1 = split(fillet2_piece_1, bisect_by=Plane(origin=(11.340639328, 5.113051829, 16.5), z_dir=(0, 0, -1)), keep=Keep.TOP, mode=Mode.PRIVATE)
    fillet2_piece_1 = split(fillet2_piece_1, bisect_by=Plane(origin=(11.340639328, 5.113051829, 12.5), z_dir=(0, 0, 1)), keep=Keep.TOP, mode=Mode.PRIVATE)
    add(fillet2_piece_1)
    with BuildSketch(Plane(origin=(12, 0, 36), x_dir=(-1, 0, 0), z_dir=(0, 0, -1))) as fillet2_piece_2_section:
        with BuildLine():
            Bezier((FILLET2_SIZE, 0), (0, 0), (0, FILLET2_SIZE_2), weights=[1, 0.707106781, 1])
            Line((0, FILLET2_SIZE_2), (0, 0))
            Line((0, 0), (FILLET2_SIZE, 0))
        make_face()
    fillet2_piece_2 = extrude(amount=52.5, mode=Mode.PRIVATE)
    fillet2_piece_2 = split(fillet2_piece_2, bisect_by=Plane(origin=(11.340638818, 5.113050372, 12.5), z_dir=(0, 0, -1)), keep=Keep.TOP, mode=Mode.PRIVATE)
    fillet2_piece_2 = split(fillet2_piece_2, bisect_by=Plane(origin=(11.340638818, 5.113050372, 9), z_dir=(0, 0, 1)), keep=Keep.TOP, mode=Mode.PRIVATE)
    add(fillet2_piece_2)
    with BuildSketch(Plane(origin=(12, 0, -9), x_dir=(-1, 0, 0), z_dir=(0, 0, -1))) as fillet2_piece_3_section:
        with BuildLine():
            Bezier((FILLET2_SIZE, 0), (0, 0), (0, FILLET2_SIZE_2), weights=[1, 0.707106781, 1])
            Line((0, FILLET2_SIZE_2), (0, 0))
            Line((0, 0), (FILLET2_SIZE, 0))
        make_face()
    fillet2_piece_3 = extrude(amount=7.5, mode=Mode.PRIVATE)
    fillet2_piece_3 = split(fillet2_piece_3, bisect_by=Plane(origin=(11.340634928, 5.11305877, -12.5), z_dir=(0, 0, 1)), keep=Keep.TOP, mode=Mode.PRIVATE)
    add(fillet2_piece_3)
    with BuildSketch(Plane(origin=(12, 0, -9), x_dir=(-1, 0, 0), z_dir=(0, 0, -1))) as fillet2_piece_4_section:
        with BuildLine():
            Bezier((FILLET2_SIZE, 0), (0, 0), (0, FILLET2_SIZE_2), weights=[1, 0.707106781, 1])
            Line((0, FILLET2_SIZE_2), (0, 0))
            Line((0, 0), (FILLET2_SIZE, 0))
        make_face()
    fillet2_piece_4 = extrude(amount=7.5, mode=Mode.PRIVATE)
    fillet2_piece_4 = split(fillet2_piece_4, bisect_by=Plane(origin=(11.340634928, 5.11305877, -12.5), z_dir=(0, 0, -1)), keep=Keep.TOP, mode=Mode.PRIVATE)
    add(fillet2_piece_4)
    with BuildSketch(Plane(origin=(12, 0, 16.5), x_dir=(0, 1, 0), z_dir=(0, 0, -1))) as fillet2_piece_5_section:
        with BuildLine():
            Bezier((FILLET2_SIZE_2, 0), (0, 0), (0, -FILLET2_SIZE), weights=[1, 0.707106781, 1])
            Line((0, -FILLET2_SIZE), (0, 0))
            Line((0, 0), (FILLET2_SIZE_2, 0))
        make_face()
    fillet2_piece_5 = extrude(amount=7.5, mode=Mode.PRIVATE)
    fillet2_piece_5 = split(fillet2_piece_5, bisect_by=Plane(origin=(11.340638125, 5.113048077, 12.5), z_dir=(0, 0, 1)), keep=Keep.TOP, mode=Mode.PRIVATE)
    add(fillet2_piece_5)
    with BuildSketch(Plane(origin=(12, 0, 16.5), x_dir=(0, 1, 0), z_dir=(0, 0, -1))) as fillet2_piece_6_section:
        with BuildLine():
            Bezier((FILLET2_SIZE_2, 0), (0, 0), (0, -FILLET2_SIZE), weights=[1, 0.707106781, 1])
            Line((0, -FILLET2_SIZE), (0, 0))
            Line((0, 0), (FILLET2_SIZE_2, 0))
        make_face()
    fillet2_piece_6 = extrude(amount=7.5, mode=Mode.PRIVATE)
    fillet2_piece_6 = split(fillet2_piece_6, bisect_by=Plane(origin=(11.34063903, 5.113050451, 12.5), z_dir=(0, 0, -1)), keep=Keep.TOP, mode=Mode.PRIVATE)
    add(fillet2_piece_6)
    with BuildSketch(Plane(origin=(12, 0, 16.5), x_dir=(0, 1, 0), z_dir=(0, 0, -1))) as fillet2_piece_7_section:
        with BuildLine():
            Bezier((FILLET2_SIZE_2, 0), (0, 0), (0, -FILLET2_SIZE), weights=[1, 0.707106781, 1])
            Line((0, -FILLET2_SIZE), (0, 0))
            Line((0, 0), (FILLET2_SIZE_2, 0))
        make_face()
    fillet2_piece_7 = extrude(amount=52.5, mode=Mode.PRIVATE)
    fillet2_piece_7 = split(fillet2_piece_7, bisect_by=Plane(origin=(11.340644798, 5.113037249, -9), z_dir=(0, 0, -1)), keep=Keep.TOP, mode=Mode.PRIVATE)
    fillet2_piece_7 = split(fillet2_piece_7, bisect_by=Plane(origin=(11.340644798, 5.113037249, -12.5), z_dir=(0, 0, 1)), keep=Keep.TOP, mode=Mode.PRIVATE)
    add(fillet2_piece_7)
    with BuildSketch(Plane(origin=(12, 0, 16.5), x_dir=(0, 1, 0), z_dir=(0, 0, -1))) as fillet2_piece_8_section:
        with BuildLine():
            Bezier((FILLET2_SIZE_2, 0), (0, 0), (0, -FILLET2_SIZE), weights=[1, 0.707106781, 1])
            Line((0, -FILLET2_SIZE), (0, 0))
            Line((0, 0), (FILLET2_SIZE_2, 0))
        make_face()
    fillet2_piece_8 = extrude(amount=52.5, mode=Mode.PRIVATE)
    fillet2_piece_8 = split(fillet2_piece_8, bisect_by=Plane(origin=(11.340644798, 5.113037249, -16.5), z_dir=(0, 0, 1)), keep=Keep.TOP, mode=Mode.PRIVATE)
    fillet2_piece_8 = split(fillet2_piece_8, bisect_by=Plane(origin=(11.340644798, 5.113037249, -12.5), z_dir=(0, 0, -1)), keep=Keep.TOP, mode=Mode.PRIVATE)
    add(fillet2_piece_8)


solid = part.part
